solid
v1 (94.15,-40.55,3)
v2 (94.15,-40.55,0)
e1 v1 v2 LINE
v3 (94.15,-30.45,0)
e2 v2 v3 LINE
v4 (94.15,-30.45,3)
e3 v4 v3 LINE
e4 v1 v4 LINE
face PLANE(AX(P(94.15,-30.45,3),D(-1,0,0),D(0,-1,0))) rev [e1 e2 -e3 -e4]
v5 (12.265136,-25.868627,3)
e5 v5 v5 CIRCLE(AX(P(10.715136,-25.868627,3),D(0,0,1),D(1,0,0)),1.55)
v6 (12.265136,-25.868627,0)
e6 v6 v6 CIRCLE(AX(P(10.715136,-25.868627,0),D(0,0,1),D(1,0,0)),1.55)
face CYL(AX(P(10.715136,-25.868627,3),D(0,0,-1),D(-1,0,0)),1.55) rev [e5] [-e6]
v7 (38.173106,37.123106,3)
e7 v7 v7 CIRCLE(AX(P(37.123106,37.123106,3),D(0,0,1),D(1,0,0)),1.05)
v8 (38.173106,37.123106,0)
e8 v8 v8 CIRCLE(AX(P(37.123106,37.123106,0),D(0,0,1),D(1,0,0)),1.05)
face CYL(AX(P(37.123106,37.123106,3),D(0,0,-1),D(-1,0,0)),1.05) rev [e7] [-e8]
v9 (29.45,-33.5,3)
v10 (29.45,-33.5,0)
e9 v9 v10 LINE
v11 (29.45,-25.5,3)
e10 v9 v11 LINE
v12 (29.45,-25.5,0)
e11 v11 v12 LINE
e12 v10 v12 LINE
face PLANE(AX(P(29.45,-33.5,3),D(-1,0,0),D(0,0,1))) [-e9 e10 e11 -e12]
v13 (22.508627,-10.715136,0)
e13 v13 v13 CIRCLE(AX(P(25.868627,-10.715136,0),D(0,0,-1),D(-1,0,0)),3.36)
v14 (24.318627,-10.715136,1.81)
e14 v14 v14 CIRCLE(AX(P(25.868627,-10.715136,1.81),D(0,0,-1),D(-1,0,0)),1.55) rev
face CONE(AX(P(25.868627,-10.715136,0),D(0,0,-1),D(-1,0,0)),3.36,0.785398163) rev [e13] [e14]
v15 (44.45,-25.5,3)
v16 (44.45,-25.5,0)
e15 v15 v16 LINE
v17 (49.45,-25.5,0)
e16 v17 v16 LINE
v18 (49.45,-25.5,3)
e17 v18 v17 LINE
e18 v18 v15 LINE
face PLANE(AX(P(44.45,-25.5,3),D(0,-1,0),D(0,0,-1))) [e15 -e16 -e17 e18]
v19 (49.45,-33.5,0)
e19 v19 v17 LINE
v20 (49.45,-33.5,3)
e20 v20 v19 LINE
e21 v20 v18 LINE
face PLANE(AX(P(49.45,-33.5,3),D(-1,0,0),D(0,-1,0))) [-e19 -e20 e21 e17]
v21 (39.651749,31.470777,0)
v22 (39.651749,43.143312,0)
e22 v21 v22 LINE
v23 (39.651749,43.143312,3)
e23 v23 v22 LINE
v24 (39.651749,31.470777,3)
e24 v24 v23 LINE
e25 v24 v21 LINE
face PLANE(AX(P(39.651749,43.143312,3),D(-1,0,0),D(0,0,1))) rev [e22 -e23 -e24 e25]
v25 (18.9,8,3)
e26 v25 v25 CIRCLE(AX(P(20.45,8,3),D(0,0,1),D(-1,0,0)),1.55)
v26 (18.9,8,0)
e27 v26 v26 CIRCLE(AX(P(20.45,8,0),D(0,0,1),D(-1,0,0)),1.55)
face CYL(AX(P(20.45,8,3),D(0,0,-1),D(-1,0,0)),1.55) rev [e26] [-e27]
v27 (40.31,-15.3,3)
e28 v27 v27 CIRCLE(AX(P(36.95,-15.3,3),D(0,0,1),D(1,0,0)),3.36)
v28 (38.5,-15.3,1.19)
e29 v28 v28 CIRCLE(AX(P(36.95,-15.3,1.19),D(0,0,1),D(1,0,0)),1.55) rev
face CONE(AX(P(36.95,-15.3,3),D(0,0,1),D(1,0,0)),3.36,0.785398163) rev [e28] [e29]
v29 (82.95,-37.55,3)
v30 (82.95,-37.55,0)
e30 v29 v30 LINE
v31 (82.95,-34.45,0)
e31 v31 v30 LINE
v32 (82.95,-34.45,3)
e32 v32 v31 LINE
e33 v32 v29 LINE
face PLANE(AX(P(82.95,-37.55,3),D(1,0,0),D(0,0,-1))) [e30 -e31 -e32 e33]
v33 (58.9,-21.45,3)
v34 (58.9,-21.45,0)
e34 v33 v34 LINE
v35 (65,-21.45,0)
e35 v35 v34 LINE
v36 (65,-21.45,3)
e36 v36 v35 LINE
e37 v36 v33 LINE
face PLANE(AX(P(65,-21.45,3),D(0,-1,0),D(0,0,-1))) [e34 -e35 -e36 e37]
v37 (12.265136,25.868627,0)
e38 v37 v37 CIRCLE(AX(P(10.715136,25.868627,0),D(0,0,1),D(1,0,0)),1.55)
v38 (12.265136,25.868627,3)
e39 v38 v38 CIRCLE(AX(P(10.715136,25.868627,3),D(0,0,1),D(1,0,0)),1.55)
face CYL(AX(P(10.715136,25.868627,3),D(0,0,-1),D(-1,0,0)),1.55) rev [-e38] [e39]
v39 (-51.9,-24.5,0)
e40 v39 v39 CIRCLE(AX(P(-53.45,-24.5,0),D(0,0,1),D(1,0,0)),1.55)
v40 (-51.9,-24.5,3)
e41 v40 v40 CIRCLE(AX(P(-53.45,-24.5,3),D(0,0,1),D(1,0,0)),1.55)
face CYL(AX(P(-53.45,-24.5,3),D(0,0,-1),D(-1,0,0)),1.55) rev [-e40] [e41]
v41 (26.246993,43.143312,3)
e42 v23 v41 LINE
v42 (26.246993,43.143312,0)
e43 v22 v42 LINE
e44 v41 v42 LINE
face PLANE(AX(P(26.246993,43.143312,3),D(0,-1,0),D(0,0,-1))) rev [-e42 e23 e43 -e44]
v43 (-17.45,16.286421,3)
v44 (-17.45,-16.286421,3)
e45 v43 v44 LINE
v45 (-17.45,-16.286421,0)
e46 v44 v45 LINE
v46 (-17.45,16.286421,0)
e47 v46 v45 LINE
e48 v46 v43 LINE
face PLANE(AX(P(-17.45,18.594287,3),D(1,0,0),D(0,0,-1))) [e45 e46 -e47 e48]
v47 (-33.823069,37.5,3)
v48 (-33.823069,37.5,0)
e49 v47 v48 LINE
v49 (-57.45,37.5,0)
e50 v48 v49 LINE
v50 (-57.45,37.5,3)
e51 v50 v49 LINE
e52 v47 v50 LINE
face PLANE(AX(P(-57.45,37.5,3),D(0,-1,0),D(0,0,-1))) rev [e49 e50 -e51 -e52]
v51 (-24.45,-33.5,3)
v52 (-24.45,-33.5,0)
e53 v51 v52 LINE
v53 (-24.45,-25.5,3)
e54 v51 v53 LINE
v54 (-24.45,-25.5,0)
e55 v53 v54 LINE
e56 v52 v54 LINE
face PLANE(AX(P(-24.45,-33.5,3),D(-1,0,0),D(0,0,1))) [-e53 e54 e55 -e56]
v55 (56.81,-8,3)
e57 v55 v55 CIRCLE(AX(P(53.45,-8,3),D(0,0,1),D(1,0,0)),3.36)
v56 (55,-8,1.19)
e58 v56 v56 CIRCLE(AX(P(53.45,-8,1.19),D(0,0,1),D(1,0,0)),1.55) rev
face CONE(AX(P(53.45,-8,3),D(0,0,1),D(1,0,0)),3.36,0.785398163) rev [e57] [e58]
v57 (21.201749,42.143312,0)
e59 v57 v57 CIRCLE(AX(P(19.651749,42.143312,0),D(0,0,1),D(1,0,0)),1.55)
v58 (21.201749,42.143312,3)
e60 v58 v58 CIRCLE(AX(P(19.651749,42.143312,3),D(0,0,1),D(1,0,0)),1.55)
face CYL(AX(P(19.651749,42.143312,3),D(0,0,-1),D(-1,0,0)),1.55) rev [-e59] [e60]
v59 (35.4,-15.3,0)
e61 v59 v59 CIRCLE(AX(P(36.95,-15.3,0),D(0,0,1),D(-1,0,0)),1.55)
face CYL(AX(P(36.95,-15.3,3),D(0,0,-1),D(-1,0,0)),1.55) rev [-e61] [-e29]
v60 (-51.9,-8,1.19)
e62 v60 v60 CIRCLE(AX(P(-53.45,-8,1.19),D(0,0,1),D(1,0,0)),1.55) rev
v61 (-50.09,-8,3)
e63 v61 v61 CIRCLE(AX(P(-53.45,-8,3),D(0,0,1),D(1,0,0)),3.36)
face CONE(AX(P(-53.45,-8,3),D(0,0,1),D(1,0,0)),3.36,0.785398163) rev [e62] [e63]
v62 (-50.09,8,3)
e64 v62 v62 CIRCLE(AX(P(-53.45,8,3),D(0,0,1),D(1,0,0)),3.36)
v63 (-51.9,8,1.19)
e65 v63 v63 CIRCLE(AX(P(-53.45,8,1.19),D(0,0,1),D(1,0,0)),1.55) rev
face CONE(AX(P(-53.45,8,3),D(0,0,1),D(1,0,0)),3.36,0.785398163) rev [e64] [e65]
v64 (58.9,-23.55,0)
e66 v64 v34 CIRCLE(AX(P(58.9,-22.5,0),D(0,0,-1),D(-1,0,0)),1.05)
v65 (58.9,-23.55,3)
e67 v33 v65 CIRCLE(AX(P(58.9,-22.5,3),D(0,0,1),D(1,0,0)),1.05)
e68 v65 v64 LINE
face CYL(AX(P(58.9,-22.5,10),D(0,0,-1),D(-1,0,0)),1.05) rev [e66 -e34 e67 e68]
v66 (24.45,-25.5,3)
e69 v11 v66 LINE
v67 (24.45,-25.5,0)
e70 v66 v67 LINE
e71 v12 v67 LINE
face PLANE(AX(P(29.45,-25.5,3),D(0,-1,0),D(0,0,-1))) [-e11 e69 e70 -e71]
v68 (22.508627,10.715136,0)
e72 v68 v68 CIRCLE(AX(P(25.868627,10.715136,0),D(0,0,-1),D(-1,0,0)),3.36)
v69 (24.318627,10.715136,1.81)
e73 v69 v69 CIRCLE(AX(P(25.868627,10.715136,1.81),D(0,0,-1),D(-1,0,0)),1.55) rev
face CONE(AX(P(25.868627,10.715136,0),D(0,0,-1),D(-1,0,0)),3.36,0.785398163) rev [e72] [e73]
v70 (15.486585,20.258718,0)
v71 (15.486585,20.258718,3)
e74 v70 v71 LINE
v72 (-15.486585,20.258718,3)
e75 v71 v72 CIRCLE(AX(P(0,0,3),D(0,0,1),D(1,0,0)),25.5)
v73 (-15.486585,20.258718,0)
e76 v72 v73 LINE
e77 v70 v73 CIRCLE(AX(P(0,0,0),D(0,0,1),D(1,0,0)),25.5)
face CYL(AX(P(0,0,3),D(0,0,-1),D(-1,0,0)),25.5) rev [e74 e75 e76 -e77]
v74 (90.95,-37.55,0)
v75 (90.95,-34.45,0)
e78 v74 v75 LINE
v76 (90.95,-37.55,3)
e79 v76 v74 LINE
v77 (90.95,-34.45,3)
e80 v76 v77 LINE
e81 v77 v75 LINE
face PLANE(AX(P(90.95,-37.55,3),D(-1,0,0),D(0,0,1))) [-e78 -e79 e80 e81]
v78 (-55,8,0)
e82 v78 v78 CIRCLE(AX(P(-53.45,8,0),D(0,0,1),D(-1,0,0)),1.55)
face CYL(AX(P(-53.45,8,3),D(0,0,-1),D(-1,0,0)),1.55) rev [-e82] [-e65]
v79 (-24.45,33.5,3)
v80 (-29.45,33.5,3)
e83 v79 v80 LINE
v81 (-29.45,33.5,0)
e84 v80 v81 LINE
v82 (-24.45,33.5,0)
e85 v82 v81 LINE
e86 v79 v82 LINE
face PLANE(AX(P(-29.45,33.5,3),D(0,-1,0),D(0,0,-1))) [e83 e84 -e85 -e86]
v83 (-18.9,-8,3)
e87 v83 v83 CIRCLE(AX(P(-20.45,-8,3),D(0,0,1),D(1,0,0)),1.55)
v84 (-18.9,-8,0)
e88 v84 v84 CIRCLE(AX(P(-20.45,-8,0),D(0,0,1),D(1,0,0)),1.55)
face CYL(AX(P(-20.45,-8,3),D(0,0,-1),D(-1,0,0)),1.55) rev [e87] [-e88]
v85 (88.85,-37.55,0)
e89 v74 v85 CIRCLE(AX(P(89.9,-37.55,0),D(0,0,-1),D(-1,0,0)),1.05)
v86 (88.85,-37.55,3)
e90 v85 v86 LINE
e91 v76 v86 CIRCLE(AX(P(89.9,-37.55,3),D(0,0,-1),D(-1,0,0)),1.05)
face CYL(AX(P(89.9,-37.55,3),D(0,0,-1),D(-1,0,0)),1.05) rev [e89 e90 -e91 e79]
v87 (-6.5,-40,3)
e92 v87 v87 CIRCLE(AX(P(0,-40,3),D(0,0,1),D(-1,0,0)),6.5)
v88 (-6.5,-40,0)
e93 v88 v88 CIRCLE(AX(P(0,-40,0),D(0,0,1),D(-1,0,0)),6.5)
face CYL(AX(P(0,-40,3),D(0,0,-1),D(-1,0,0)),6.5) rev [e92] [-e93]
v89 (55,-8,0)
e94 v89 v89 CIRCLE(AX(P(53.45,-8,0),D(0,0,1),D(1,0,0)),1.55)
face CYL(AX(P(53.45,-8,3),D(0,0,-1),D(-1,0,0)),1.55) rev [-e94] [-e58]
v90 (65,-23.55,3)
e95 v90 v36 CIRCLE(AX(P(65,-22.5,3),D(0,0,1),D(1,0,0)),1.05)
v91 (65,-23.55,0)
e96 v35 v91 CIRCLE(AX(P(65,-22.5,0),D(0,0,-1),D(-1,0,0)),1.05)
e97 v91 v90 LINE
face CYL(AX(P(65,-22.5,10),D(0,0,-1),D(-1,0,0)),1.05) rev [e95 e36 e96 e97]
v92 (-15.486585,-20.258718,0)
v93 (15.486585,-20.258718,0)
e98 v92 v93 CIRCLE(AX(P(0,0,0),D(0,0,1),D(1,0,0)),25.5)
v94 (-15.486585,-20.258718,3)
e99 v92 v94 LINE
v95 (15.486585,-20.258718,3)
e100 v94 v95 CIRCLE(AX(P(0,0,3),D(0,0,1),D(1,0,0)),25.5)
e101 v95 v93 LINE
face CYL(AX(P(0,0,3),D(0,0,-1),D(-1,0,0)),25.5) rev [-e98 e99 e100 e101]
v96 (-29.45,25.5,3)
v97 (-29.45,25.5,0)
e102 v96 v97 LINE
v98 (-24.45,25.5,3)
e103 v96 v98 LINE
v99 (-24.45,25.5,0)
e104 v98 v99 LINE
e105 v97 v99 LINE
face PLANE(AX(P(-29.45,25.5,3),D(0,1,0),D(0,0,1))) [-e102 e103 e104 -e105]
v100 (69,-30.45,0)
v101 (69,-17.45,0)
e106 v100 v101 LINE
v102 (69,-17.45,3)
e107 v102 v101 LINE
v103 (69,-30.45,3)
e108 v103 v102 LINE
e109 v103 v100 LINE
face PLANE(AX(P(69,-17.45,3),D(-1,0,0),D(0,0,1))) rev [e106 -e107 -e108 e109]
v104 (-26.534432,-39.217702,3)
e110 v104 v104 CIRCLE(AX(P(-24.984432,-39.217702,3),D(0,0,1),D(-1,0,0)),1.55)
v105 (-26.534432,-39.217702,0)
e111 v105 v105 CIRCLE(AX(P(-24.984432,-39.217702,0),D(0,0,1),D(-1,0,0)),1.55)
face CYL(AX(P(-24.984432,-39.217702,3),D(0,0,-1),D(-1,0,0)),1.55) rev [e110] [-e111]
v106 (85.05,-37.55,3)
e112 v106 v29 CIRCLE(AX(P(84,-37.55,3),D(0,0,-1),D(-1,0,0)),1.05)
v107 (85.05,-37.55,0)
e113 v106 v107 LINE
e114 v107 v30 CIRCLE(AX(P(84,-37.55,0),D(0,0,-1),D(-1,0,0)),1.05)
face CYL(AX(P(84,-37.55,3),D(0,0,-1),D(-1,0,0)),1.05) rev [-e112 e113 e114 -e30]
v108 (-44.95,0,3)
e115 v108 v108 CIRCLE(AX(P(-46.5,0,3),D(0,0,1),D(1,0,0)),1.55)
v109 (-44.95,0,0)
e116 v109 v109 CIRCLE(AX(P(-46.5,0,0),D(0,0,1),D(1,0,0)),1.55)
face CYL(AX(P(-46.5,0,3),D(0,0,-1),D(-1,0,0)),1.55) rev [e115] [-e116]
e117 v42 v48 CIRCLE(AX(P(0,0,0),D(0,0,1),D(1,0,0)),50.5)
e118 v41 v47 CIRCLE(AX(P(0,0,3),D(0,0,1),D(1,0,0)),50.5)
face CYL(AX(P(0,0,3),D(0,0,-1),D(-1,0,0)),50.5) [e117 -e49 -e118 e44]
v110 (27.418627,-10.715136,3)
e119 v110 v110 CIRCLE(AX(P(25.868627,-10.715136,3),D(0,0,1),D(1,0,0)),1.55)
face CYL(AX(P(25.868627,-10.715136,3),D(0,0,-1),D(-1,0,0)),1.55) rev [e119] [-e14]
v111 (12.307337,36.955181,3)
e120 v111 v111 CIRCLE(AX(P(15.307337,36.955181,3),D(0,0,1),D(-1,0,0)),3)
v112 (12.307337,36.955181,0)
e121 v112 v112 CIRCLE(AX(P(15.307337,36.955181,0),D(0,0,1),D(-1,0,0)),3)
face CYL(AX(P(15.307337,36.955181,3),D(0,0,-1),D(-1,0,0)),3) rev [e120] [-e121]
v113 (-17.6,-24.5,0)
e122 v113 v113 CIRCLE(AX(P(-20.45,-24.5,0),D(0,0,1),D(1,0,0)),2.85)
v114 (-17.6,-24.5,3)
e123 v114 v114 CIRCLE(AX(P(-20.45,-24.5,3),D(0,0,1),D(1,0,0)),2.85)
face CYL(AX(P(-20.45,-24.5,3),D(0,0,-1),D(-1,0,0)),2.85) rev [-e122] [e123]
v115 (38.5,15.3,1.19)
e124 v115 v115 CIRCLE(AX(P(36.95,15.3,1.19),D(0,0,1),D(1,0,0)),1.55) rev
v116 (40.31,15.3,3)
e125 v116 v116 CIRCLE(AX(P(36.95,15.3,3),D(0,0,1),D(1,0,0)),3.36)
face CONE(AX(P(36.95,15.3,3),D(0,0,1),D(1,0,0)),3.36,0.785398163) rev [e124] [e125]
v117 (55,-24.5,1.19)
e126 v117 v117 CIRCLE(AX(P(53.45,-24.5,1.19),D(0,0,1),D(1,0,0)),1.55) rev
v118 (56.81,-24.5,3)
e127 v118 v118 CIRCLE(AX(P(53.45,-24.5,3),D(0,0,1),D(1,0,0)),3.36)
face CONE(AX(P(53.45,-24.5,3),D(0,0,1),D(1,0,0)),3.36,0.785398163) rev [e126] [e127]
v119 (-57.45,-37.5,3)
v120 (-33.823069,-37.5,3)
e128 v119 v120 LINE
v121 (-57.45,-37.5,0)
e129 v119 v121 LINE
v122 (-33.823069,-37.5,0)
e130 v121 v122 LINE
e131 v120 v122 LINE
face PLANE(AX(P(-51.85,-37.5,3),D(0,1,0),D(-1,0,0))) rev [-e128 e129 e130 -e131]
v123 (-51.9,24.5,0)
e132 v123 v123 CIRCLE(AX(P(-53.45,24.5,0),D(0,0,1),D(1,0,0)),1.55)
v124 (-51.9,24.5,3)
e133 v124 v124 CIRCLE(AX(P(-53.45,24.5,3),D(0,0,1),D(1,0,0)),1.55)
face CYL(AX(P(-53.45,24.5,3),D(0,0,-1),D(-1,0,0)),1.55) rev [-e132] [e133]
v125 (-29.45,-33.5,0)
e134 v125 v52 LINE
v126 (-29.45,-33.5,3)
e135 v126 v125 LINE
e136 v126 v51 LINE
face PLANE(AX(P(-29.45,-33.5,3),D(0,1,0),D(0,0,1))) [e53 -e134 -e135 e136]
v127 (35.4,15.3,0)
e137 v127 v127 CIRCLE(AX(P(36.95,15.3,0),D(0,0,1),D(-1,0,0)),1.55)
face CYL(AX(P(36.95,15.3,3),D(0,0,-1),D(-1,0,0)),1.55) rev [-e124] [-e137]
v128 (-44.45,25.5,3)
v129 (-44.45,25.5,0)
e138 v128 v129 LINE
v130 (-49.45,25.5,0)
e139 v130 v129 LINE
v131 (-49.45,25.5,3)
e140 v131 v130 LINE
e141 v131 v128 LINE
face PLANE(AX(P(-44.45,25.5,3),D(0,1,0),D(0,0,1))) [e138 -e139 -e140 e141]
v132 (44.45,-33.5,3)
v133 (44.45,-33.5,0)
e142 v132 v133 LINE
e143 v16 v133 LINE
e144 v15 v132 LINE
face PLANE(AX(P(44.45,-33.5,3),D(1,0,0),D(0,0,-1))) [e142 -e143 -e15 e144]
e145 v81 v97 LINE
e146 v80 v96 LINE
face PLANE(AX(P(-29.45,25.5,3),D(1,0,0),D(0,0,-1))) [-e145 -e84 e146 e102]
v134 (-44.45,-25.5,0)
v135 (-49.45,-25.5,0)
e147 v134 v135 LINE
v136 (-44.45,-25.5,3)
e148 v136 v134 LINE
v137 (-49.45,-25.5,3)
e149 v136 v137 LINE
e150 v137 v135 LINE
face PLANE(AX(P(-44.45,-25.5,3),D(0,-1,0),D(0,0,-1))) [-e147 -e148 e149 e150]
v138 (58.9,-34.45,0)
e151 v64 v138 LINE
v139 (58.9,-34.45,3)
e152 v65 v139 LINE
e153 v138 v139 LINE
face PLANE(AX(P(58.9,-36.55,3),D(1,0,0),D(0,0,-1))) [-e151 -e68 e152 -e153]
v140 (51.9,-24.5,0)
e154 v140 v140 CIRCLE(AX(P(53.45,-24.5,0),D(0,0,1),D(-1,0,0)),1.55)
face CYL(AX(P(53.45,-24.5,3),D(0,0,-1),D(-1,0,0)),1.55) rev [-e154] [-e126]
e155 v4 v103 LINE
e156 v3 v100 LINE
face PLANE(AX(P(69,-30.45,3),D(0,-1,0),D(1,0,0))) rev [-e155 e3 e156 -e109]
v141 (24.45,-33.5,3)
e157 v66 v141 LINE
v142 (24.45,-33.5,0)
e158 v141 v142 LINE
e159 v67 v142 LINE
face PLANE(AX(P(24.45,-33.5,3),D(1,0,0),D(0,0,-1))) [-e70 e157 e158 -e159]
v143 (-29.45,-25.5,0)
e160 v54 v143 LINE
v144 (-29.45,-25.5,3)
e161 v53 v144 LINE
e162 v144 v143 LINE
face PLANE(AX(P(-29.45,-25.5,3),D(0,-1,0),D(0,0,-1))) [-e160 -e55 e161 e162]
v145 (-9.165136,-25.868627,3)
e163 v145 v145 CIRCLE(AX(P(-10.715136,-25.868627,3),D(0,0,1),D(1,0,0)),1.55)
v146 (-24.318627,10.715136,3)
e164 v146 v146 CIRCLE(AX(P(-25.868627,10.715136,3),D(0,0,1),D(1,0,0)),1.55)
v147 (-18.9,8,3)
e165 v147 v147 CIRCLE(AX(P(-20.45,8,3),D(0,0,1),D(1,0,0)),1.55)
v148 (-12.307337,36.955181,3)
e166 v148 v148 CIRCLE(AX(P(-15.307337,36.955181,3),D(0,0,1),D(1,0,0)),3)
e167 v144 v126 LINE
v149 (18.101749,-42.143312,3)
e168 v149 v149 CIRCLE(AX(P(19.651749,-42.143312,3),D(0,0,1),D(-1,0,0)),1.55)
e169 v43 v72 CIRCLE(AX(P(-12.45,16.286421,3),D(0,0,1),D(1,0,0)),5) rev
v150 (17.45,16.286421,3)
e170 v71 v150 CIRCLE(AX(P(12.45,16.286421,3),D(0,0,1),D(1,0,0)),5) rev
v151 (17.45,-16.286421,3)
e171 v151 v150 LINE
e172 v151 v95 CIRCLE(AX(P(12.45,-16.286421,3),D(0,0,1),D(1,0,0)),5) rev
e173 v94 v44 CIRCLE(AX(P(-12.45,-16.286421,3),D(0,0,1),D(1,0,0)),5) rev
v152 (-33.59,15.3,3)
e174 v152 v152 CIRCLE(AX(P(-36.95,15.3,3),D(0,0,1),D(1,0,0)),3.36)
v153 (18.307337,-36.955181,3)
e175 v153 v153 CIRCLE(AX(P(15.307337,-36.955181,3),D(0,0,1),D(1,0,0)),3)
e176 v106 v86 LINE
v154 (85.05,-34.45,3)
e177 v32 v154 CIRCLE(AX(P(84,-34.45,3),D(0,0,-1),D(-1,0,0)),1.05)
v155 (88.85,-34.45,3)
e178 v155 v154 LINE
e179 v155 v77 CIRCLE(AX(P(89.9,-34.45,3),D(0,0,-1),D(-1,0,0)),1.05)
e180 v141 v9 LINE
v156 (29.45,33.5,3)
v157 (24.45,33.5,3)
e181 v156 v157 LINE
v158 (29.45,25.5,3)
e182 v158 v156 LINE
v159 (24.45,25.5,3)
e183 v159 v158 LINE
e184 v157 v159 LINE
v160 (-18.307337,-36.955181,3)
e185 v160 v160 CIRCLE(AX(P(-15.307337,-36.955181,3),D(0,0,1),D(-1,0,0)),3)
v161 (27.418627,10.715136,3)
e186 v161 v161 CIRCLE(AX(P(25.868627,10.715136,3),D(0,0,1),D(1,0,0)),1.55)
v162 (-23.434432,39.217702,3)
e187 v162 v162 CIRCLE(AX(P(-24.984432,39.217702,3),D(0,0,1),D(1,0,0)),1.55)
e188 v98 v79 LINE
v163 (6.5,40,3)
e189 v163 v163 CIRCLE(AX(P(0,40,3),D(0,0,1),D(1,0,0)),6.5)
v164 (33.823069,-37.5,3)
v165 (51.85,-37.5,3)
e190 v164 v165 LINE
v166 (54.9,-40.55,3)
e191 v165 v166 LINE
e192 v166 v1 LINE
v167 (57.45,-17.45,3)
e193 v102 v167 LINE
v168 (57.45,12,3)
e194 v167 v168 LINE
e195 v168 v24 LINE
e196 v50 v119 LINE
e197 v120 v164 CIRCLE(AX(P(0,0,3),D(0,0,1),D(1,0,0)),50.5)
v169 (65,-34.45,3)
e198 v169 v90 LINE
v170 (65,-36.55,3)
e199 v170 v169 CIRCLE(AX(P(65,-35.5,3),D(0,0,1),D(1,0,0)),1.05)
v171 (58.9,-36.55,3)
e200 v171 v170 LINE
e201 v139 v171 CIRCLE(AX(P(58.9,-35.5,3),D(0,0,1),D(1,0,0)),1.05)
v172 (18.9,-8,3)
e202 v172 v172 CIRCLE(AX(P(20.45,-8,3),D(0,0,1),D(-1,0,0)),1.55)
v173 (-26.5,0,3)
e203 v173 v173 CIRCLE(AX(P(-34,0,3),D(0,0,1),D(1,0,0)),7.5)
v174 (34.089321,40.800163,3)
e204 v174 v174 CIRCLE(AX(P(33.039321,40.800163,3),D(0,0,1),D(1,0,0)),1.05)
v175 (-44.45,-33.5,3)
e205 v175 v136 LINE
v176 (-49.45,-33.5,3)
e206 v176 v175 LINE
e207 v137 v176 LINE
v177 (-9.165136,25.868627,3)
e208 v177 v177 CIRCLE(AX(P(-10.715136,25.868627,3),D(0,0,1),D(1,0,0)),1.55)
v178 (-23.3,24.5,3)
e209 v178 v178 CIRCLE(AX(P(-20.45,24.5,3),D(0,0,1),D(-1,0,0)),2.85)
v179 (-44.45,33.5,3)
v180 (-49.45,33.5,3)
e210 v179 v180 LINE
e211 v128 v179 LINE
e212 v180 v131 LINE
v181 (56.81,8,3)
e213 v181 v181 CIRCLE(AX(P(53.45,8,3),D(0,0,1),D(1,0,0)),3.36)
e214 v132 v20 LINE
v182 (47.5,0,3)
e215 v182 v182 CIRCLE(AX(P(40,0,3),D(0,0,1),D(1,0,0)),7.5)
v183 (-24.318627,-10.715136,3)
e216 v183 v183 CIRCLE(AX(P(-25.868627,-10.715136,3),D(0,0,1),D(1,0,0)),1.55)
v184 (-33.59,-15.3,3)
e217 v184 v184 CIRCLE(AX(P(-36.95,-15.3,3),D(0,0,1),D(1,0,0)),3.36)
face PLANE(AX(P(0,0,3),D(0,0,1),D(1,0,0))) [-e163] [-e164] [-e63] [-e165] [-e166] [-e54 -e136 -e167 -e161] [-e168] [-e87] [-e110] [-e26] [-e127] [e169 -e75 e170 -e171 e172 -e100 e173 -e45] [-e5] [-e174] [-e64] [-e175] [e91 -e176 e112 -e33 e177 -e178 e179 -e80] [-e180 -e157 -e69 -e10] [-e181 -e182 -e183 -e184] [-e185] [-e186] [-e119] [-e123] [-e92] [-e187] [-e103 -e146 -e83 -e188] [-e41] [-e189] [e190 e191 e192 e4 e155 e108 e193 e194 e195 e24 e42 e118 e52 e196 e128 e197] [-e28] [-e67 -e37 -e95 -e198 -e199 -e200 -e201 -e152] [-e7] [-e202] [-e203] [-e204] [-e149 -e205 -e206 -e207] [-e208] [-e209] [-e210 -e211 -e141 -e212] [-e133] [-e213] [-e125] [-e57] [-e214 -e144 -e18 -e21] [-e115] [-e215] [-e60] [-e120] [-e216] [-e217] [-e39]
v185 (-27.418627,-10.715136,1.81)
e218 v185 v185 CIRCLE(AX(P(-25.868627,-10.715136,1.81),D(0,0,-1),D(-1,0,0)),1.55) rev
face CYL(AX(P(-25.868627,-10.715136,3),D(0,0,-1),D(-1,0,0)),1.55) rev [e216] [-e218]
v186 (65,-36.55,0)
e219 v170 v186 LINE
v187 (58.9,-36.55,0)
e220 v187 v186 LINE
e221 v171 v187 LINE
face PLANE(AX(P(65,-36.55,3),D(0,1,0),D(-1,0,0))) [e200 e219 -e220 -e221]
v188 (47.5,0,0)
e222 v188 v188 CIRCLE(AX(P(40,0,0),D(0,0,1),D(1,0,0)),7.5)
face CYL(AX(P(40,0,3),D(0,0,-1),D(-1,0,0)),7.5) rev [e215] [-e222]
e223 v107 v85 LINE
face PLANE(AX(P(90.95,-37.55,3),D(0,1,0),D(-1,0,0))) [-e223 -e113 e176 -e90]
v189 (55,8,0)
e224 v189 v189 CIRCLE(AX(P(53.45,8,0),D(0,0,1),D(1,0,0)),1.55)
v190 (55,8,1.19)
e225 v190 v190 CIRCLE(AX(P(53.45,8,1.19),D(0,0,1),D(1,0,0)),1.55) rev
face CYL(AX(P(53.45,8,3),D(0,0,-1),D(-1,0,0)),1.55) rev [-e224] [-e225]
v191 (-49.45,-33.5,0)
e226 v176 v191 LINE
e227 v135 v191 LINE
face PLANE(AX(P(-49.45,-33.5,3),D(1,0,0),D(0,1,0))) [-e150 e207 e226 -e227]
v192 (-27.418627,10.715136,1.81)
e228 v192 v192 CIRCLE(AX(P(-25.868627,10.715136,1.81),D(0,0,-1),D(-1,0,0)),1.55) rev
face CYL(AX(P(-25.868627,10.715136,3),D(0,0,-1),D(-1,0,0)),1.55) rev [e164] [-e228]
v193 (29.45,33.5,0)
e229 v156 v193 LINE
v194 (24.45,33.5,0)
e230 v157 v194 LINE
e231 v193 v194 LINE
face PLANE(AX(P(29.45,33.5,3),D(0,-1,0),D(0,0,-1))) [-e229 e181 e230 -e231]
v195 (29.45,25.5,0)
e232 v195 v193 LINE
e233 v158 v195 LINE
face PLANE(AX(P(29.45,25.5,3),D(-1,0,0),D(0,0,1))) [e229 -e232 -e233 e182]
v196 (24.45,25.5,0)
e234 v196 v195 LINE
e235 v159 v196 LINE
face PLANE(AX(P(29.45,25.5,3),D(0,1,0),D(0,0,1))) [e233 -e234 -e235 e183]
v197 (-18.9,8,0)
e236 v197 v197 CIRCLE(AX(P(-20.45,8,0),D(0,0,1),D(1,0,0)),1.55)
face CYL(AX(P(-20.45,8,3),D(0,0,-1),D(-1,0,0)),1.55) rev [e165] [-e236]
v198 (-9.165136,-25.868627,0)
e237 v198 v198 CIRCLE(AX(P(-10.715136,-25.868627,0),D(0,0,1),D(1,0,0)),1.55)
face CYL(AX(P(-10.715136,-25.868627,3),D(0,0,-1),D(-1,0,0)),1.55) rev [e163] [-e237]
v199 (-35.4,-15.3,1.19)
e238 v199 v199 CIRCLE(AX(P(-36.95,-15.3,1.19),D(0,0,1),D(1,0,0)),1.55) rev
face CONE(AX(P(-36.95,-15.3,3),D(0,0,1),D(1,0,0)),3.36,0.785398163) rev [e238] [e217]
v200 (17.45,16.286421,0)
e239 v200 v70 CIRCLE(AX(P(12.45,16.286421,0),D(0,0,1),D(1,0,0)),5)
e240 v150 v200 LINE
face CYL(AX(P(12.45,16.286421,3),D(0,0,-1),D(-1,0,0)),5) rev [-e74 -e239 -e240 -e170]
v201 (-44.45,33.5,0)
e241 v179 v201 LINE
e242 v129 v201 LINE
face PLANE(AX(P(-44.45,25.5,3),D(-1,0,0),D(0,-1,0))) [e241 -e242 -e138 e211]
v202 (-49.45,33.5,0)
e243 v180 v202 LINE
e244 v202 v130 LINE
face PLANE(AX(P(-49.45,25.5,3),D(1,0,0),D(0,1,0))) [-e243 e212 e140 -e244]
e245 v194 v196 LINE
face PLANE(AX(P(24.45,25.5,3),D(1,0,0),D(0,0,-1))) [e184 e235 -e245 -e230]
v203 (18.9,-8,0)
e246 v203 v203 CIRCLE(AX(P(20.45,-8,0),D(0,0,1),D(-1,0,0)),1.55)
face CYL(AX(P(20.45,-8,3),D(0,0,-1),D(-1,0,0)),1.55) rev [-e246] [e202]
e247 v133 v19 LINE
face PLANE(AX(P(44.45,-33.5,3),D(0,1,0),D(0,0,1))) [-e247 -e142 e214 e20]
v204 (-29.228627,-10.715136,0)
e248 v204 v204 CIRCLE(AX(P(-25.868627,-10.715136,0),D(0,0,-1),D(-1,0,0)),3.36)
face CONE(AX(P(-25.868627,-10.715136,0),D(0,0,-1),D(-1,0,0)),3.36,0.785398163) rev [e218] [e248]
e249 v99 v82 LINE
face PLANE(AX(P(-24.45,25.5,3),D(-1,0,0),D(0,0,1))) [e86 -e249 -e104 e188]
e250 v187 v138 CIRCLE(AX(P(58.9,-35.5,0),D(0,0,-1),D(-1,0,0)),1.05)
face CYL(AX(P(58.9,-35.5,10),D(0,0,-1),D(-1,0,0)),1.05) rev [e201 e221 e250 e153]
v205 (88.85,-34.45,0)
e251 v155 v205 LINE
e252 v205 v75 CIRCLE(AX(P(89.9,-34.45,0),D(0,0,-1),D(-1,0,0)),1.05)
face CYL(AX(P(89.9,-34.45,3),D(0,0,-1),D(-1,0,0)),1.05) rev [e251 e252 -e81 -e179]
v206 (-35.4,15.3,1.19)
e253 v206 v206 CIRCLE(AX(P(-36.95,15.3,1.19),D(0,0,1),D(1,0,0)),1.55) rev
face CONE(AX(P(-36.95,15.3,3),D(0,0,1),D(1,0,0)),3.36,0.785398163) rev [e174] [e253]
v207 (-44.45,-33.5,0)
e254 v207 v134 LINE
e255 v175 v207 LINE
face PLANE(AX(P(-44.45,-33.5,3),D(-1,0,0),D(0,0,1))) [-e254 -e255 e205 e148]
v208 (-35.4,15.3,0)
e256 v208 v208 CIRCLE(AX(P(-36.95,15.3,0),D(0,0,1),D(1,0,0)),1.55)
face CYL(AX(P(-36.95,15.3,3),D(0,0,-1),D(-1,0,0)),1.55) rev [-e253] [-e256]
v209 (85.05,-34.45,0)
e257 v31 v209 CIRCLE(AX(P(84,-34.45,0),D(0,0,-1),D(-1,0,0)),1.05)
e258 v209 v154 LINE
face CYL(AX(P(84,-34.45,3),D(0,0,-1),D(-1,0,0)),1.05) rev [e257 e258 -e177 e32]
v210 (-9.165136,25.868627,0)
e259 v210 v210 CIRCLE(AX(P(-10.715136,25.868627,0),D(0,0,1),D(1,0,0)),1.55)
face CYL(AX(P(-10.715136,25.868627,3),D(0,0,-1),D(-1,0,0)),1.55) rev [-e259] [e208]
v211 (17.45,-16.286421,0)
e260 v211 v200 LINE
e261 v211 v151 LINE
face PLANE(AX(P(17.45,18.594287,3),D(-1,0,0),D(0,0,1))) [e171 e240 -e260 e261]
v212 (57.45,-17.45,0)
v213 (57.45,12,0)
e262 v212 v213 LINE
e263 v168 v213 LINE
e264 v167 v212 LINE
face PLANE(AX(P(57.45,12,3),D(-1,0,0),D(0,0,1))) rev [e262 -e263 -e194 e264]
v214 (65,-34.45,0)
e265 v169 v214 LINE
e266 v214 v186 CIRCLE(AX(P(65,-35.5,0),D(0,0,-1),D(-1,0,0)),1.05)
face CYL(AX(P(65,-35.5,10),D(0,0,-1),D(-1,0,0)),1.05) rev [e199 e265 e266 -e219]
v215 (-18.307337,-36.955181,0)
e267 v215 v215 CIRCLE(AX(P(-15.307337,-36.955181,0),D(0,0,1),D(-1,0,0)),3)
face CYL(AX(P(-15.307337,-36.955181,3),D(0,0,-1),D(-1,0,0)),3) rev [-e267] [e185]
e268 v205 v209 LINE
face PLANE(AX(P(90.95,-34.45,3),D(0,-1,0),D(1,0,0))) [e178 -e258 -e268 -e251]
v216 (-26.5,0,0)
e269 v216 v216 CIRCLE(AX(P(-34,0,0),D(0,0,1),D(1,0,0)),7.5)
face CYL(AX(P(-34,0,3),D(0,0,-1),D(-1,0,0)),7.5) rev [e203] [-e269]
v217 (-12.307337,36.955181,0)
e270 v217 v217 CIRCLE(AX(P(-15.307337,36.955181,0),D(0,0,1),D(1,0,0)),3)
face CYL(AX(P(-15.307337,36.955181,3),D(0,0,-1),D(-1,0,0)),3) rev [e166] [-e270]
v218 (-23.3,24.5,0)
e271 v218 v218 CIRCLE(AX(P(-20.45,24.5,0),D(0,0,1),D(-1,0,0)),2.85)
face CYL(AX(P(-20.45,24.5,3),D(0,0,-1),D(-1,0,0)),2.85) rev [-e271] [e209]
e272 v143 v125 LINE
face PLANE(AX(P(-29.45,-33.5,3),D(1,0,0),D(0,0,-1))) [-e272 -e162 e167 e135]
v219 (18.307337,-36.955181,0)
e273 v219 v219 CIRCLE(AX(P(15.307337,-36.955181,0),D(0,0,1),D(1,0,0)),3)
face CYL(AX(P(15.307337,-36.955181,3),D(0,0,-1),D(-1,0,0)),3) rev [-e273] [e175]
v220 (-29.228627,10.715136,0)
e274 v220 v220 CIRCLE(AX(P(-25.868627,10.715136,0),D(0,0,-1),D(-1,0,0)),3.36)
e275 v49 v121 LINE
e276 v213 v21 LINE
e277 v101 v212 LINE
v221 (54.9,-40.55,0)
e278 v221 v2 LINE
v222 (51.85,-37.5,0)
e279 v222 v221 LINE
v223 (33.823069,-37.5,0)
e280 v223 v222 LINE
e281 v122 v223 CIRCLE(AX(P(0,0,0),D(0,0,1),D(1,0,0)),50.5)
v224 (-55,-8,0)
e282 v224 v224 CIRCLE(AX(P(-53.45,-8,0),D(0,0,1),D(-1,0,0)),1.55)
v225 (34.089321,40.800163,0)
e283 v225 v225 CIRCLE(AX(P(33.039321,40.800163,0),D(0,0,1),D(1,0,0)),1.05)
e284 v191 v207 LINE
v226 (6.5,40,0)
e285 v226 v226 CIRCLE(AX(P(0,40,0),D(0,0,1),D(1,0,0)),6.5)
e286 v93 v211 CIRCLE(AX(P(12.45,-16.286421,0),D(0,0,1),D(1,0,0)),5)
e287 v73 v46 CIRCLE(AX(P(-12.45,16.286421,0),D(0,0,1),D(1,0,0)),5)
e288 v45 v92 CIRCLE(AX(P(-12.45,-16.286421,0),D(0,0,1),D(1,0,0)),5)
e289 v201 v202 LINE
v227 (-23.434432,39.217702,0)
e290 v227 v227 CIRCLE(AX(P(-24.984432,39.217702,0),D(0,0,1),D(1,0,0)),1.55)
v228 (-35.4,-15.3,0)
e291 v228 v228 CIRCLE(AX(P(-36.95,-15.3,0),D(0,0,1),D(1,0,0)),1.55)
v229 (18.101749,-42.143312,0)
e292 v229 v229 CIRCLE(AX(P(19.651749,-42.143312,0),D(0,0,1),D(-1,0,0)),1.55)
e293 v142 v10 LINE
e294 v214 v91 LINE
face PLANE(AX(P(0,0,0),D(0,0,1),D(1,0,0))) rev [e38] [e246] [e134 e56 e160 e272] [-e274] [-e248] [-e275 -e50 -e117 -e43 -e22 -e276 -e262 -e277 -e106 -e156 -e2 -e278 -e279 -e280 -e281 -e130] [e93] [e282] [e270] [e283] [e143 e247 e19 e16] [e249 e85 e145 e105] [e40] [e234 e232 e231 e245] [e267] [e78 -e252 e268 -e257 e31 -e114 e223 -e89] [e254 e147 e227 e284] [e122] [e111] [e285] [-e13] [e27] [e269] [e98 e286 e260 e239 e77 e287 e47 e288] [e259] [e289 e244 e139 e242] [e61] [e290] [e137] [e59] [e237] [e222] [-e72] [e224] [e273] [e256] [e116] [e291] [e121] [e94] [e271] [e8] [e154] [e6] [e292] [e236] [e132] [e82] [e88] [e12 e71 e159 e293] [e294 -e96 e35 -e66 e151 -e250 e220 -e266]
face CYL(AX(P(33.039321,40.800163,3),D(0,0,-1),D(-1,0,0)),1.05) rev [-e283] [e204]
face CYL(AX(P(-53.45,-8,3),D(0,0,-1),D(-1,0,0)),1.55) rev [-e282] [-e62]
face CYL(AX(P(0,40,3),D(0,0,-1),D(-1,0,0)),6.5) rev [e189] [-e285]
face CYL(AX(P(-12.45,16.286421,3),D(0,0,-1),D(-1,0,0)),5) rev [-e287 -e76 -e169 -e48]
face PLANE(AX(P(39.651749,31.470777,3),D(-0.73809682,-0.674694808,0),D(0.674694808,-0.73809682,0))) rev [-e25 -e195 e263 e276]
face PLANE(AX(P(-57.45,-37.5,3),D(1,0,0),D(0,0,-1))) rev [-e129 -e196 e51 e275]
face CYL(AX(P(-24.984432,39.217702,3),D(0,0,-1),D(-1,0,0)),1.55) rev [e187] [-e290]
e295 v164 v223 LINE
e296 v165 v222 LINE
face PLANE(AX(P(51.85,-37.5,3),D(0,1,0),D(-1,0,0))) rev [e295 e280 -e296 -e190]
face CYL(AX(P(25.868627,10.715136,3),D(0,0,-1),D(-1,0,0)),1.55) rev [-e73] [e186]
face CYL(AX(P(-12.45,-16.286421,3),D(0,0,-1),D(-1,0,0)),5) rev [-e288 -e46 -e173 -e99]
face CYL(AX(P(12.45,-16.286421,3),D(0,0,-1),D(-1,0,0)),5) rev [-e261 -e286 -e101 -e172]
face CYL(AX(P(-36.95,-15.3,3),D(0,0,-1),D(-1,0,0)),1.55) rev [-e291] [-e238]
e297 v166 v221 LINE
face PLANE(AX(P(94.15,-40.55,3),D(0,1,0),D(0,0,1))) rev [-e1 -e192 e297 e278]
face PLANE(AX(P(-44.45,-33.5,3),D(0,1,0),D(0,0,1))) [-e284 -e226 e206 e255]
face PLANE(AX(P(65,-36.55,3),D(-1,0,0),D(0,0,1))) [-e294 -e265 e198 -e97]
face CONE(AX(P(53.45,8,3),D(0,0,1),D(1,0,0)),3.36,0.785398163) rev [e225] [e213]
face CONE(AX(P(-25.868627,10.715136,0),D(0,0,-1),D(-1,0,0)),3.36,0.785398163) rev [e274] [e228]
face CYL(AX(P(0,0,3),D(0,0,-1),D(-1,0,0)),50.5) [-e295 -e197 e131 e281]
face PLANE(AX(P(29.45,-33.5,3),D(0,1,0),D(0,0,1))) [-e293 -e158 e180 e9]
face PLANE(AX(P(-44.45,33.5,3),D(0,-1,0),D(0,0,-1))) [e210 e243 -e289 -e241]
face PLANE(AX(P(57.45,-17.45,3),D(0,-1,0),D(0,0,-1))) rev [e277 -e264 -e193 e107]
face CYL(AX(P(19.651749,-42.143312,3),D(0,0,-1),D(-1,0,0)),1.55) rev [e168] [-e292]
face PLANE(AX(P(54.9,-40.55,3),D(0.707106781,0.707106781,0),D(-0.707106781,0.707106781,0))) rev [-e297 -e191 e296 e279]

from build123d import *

# Parameters (mm, degrees)
SKETCH_1_R                  = 1.55
SKETCH_1_R_2                = 3
SKETCH_1_R_3                = 1.05
SKETCH_1_R_4                = 7.5
SKETCH_1_R_5                = 6.5
SKETCH_1_R_6                = 2.85
SKETCH_1_W                  = 5
SKETCH_1_H                  = 8
SKETCH_1_W_2                = 6.1
SKETCH_1_H_2                = 15.1
SKETCH_1_W_3                = 8
SKETCH_1_H_3                = 3.1
EXTRUDE_1_DEPTH             = 3
HOLE_WIZARD_M3_1_AT_2_COUNT = 2
HOLE_WIZARD_M3_1_AT_2_PITCH = 16
FILLET_1_R                  = 5
SKETCH_5_R                  = 1.05
CUT_EXTRUDE_1_DEPTH         = 10
SKETCH_7_R                  = 1.05
CUT_EXTRUDE_3_DEPTH         = 107.88064605


# Read off the part's stored shape, not the designer's step: M3 六角凹锥坑螺钉的锥形沉头孔2
with BuildPart() as part:
    # 草图1 → 凸台-拉伸1 (new body)
    with BuildSketch(Plane.XY):
        with BuildLine():
            Line((57.45, 12), (57.45, -12))
            Line((57.45, -12), (57.45, -17.45))
            Line((57.45, -17.45), (69, -17.45))
            Line((69, -17.45), (69, -30.45))
            Line((69, -30.45), (94.15, -30.45))
            Line((94.15, -30.45), (94.15, -40.55))
            Line((94.15, -40.55), (69, -40.55))
            Line((69, -40.55), (54.9, -40.55))
            Line((54.9, -40.55), (51.85, -37.5))
            Line((51.85, -37.5), (33.823069051, -37.5))
            ThreePointArc((33.823069051, -37.5), (0, -50.5), (-33.823069051, -37.5))
            Line((-33.823069051, -37.5), (-51.85, -37.5))
            Line((-51.85, -37.5), (-57.45, -37.5))
            Line((-57.45, -37.5), (-57.45, -17.45))
            Line((-57.45, -17.45), (-57.45, 17.45))
            Line((-57.45, 17.45), (-57.45, 37.5))
            Line((-57.45, 37.5), (-51.85, 37.5))
            Line((-51.85, 37.5), (-33.823069051, 37.5))
            ThreePointArc((-33.823069051, 37.5), (-4.723449629, 50.278613979), (26.246992614, 43.143312097))
            Line((26.246992614, 43.143312097), (39.651749171, 43.143312097))
            Line((39.651749171, 43.143312097), (39.651749171, 31.470777261))
            Line((39.651749171, 31.470777261), (57.45, 12))
        make_face()
        with Locations((-53.45, 24.5)):
            Circle(SKETCH_1_R, mode=Mode.SUBTRACT)
        with Locations((-53.45, -24.5)):
            Circle(SKETCH_1_R, mode=Mode.SUBTRACT)
        with Locations((-20.45, 8)):
            Circle(SKETCH_1_R, mode=Mode.SUBTRACT)
        with Locations((-20.45, -8)):
            Circle(SKETCH_1_R, mode=Mode.SUBTRACT)
        with Locations(Location((20.45, -8, 0), (0, 0, 180))):
            Circle(SKETCH_1_R, mode=Mode.SUBTRACT)
        with Locations(Location((20.45, 8, 0), (0, 0, 180))):
            Circle(SKETCH_1_R, mode=Mode.SUBTRACT)
        with Locations((53.45, 8)):
            Circle(SKETCH_1_R, mode=Mode.SUBTRACT)
        with Locations((53.45, -8)):
            Circle(SKETCH_1_R, mode=Mode.SUBTRACT)
        with Locations((-46.5, 0)):
            Circle(SKETCH_1_R, mode=Mode.SUBTRACT)
        with Locations((-24.984431788, 39.21770223)):
            Circle(SKETCH_1_R, mode=Mode.SUBTRACT)
        with Locations((19.651749171, 42.143312097)):
            Circle(SKETCH_1_R, mode=Mode.SUBTRACT)
        with Locations(Location((19.651749171, -42.143312097, 0), (0, 0, 180))):
            Circle(SKETCH_1_R, mode=Mode.SUBTRACT)
        with Locations(Location((-24.984431788, -39.21770223, 0), (0, 0, 180))):
            Circle(SKETCH_1_R, mode=Mode.SUBTRACT)
        with Locations((-10.715136106, 25.86862691)):
            Circle(SKETCH_1_R, mode=Mode.SUBTRACT)
        with Locations((10.715136106, 25.86862691)):
            Circle(SKETCH_1_R, mode=Mode.SUBTRACT)
        with Locations((25.86862691, 10.715136106)):
            Circle(SKETCH_1_R, mode=Mode.SUBTRACT)
        with Locations((25.86862691, -10.715136106)):
            Circle(SKETCH_1_R, mode=Mode.SUBTRACT)
        with Locations((10.715136106, -25.86862691)):
            Circle(SKETCH_1_R, mode=Mode.SUBTRACT)
        with Locations((-10.715136106, -25.86862691)):
            Circle(SKETCH_1_R, mode=Mode.SUBTRACT)
        with Locations((-25.86862691, -10.715136106)):
            Circle(SKETCH_1_R, mode=Mode.SUBTRACT)
        with Locations((-25.86862691, 10.715136106)):
            Circle(SKETCH_1_R, mode=Mode.SUBTRACT)
        with Locations((-36.95, 15.3)):
            Circle(SKETCH_1_R, mode=Mode.SUBTRACT)
        with Locations((-36.95, -15.3)):
            Circle(SKETCH_1_R, mode=Mode.SUBTRACT)
        with Locations(Location((36.95, -15.3, 0), (0, 0, 180))):
            Circle(SKETCH_1_R, mode=Mode.SUBTRACT)
        with Locations(Location((36.95, 15.3, 0), (0, 0, 180))):
            Circle(SKETCH_1_R, mode=Mode.SUBTRACT)
        with Locations((-15.307337295, 36.9551813)):
            Circle(SKETCH_1_R_2, mode=Mode.SUBTRACT)
        with Locations(Location((15.307337295, 36.9551813, 0), (0, 0, 180))):
            Circle(SKETCH_1_R_2, mode=Mode.SUBTRACT)
        with Locations(Location((-15.307337295, -36.9551813, 0), (0, 0, 180))):
            Circle(SKETCH_1_R_2, mode=Mode.SUBTRACT)
        with Locations((15.307337295, -36.9551813)):
            Circle(SKETCH_1_R_2, mode=Mode.SUBTRACT)
        with Locations((33.03932053, 40.800162976)):
            Circle(SKETCH_1_R_3, mode=Mode.SUBTRACT)
        with Locations((37.123106012, 37.123106012)):
            Circle(SKETCH_1_R_3, mode=Mode.SUBTRACT)
        with Locations((40, 0)):
            Circle(SKETCH_1_R_4, mode=Mode.SUBTRACT)
        with Locations((0, 40)):
            Circle(SKETCH_1_R_5, mode=Mode.SUBTRACT)
        with Locations(Location((0, -40, 0), (0, 0, 180))):
            Circle(SKETCH_1_R_5, mode=Mode.SUBTRACT)
        with Locations(Location((-53.45, -8, 0), (0, 0, 180))):
            Circle(SKETCH_1_R, mode=Mode.SUBTRACT)
        with Locations(Location((-53.45, 8, 0), (0, 0, 180))):
            Circle(SKETCH_1_R, mode=Mode.SUBTRACT)
        with Locations((-20.45, -24.5)):
            Circle(SKETCH_1_R_6, mode=Mode.SUBTRACT)
        with Locations(Location((-20.45, 24.5, 0), (0, 0, 180))):
            Circle(SKETCH_1_R_6, mode=Mode.SUBTRACT)
        with Locations(Location((53.45, -24.5, 0), (0, 0, 180))):
            Circle(SKETCH_1_R, mode=Mode.SUBTRACT)
        with Locations((-34, 0)):
            Circle(SKETCH_1_R_4, mode=Mode.SUBTRACT)
        with BuildLine():
            Line((-17.45, 18.594286757), (-17.45, -18.594286757))
            ThreePointArc((-17.45, -18.594286757), (0, -25.5), (17.45, -18.594286757))
            Line((17.45, -18.594286757), (17.45, 18.594286757))
            ThreePointArc((17.45, 18.594286757), (0, 25.5), (-17.45, 18.594286757))
        make_face(mode=Mode.SUBTRACT)
        with Locations((-26.95, -29.5)):
            Rectangle(SKETCH_1_W, SKETCH_1_H, mode=Mode.SUBTRACT)
        with Locations((-46.95, 29.5)):
            Rectangle(SKETCH_1_W, SKETCH_1_H, mode=Mode.SUBTRACT)
        with Locations((-46.95, -29.5)):
            Rectangle(SKETCH_1_W, SKETCH_1_H, mode=Mode.SUBTRACT)
        with Locations((-26.95, 29.5)):
            Rectangle(SKETCH_1_W, SKETCH_1_H, mode=Mode.SUBTRACT)
        with Locations((46.95, -29.5)):
            Rectangle(SKETCH_1_W, SKETCH_1_H, mode=Mode.SUBTRACT)
        with Locations((26.95, -29.5)):
            Rectangle(SKETCH_1_W, SKETCH_1_H, mode=Mode.SUBTRACT)
        with Locations((26.95, 29.5)):
            Rectangle(SKETCH_1_W, SKETCH_1_H, mode=Mode.SUBTRACT)
        with Locations((61.95, -29)):
            Rectangle(SKETCH_1_W_2, SKETCH_1_H_2, mode=Mode.SUBTRACT)
        with Locations((86.95, -36)):
            Rectangle(SKETCH_1_W_3, SKETCH_1_H_3, mode=Mode.SUBTRACT)
    extrude(amount=EXTRUDE_1_DEPTH)

    # 草图3 → M3 六角凹锥坑螺钉的锥形沉头孔1 (revolve, cut)
    with BuildSketch(Plane(origin=(-53.45, -8, 3), x_dir=(0, -1, 0), z_dir=(1, 0, 0))):
        Polygon((0, 0), (0, 3), (1.5, 3), (1.5, 1.86), (3.36, 0), align=None)
    hole_wizard_m3_1 = revolve(axis=Axis((-53.45, -8, 9.35), (0, 0, -1)), mode=Mode.SUBTRACT)

    # M3 六角凹锥坑螺钉的锥形沉头孔1 at 2: M3 六角凹锥坑螺钉的锥形沉头孔1 ×2
    with Locations(*[(0, i * HOLE_WIZARD_M3_1_AT_2_PITCH, 0) for i in range(1, HOLE_WIZARD_M3_1_AT_2_COUNT)]):
        add(hole_wizard_m3_1, mode=Mode.SUBTRACT)

    # 圆角1
    fillet_1_edges = [part.edges().sort_by_distance(p)[0] for p in [
        (17.45, 18.594286757, 1.5),
        (-17.45, 18.594286757, 1.5),
        (-17.45, -18.594286757, 1.5),
        (17.45, -18.594286757, 1.5),
    ]]
    fillet(fillet_1_edges, radius=FILLET_1_R)

    # M3 六角凹锥坑螺钉的锥形沉头孔2 outline → M3 六角凹锥坑螺钉的锥形沉头孔2 (revolve, cut)
    with BuildSketch(Plane(origin=(53.45, 8, 0), x_dir=(1, 0, 0), z_dir=(0, -1, 0))):
        Polygon((1.55, 3), (1.55, 1.19), (3.36, 3), align=None)
    revolve(axis=Axis((53.45, 8, 0), (0, 0, 1)), mode=Mode.SUBTRACT)

    # Hole Wizard M3 _2 2 outline → Hole Wizard M3 _2 2 (revolve, cut)
    with BuildSketch(Plane(origin=(53.45, -8, 0), x_dir=(1, 0, 0), z_dir=(0, -1, 0))):
        Polygon((1.55, 3), (1.55, 1.19), (3.36, 3), align=None)
    revolve(axis=Axis((53.45, -8, 0), (0, 0, 1)), mode=Mode.SUBTRACT)

    # Hole Wizard M3 _2 3 outline → Hole Wizard M3 _2 3 (revolve, cut)
    with BuildSketch(Plane(origin=(53.45, -24.5, 0), x_dir=(1, 0, 0), z_dir=(0, -1, 0))):
        Polygon((1.55, 3), (1.55, 1.19), (3.36, 3), align=None)
    revolve(axis=Axis((53.45, -24.5, 0), (0, 0, 1)), mode=Mode.SUBTRACT)

    # Hole Wizard M3 _2 4 outline → Hole Wizard M3 _2 4 (revolve, cut)
    with BuildSketch(Plane(origin=(-36.95, 15.3, 0), x_dir=(1, 0, 0), z_dir=(0, -1, 0))):
        Polygon((1.55, 3), (1.55, 1.19), (3.36, 3), align=None)
    revolve(axis=Axis((-36.95, 15.3, 0), (0, 0, 1)), mode=Mode.SUBTRACT)

    # Hole Wizard M3 _2 5 outline → Hole Wizard M3 _2 5 (revolve, cut)
    with BuildSketch(Plane(origin=(-36.95, -15.3, 0), x_dir=(1, 0, 0), z_dir=(0, -1, 0))):
        Polygon((1.55, 3), (1.55, 1.19), (3.36, 3), align=None)
    revolve(axis=Axis((-36.95, -15.3, 0), (0, 0, 1)), mode=Mode.SUBTRACT)

    # Hole Wizard M3 _2 6 outline → Hole Wizard M3 _2 6 (revolve, cut)
    with BuildSketch(Plane(origin=(36.95, 15.3, 0), x_dir=(1, 0, 0), z_dir=(0, -1, 0))):
        Polygon((1.55, 3), (1.55, 1.19), (3.36, 3), align=None)
    revolve(axis=Axis((36.95, 15.3, 0), (0, 0, 1)), mode=Mode.SUBTRACT)

    # Hole Wizard M3 _2 7 outline → Hole Wizard M3 _2 7 (revolve, cut)
    with BuildSketch(Plane(origin=(36.95, -15.3, 0), x_dir=(1, 0, 0), z_dir=(0, -1, 0))):
        Polygon((1.55, 3), (1.55, 1.19), (3.36, 3), align=None)
    revolve(axis=Axis((36.95, -15.3, 0), (0, 0, 1)), mode=Mode.SUBTRACT)

    # Hole Wizard M3 _2 8 outline → Hole Wizard M3 _2 8 (revolve, cut)
    with BuildSketch(Plane(origin=(25.86862691, 10.715136106, 0), x_dir=(1, 0, 0), z_dir=(0, -1, 0))):
        Polygon((3.36, 0), (1.55, 1.81), (1.55, 0), align=None)
    revolve(axis=Axis((25.86862691, 10.715136106, 0), (0, 0, 1)), mode=Mode.SUBTRACT)

    # Hole Wizard M3 _2 9 outline → Hole Wizard M3 _2 9 (revolve, cut)
    with BuildSketch(Plane(origin=(25.86862691, -10.715136106, 0), x_dir=(1, 0, 0), z_dir=(0, -1, 0))):
        Polygon((3.36, 0), (1.55, 1.81), (1.55, 0), align=None)
    revolve(axis=Axis((25.86862691, -10.715136106, 0), (0, 0, 1)), mode=Mode.SUBTRACT)

    # Hole Wizard M3 _2 10 outline → Hole Wizard M3 _2 10 (revolve, cut)
    with BuildSketch(Plane(origin=(-25.86862691, 10.715136106, 0), x_dir=(1, 0, 0), z_dir=(0, -1, 0))):
        Polygon((3.36, 0), (1.55, 1.81), (1.55, 0), align=None)
    revolve(axis=Axis((-25.86862691, 10.715136106, 0), (0, 0, 1)), mode=Mode.SUBTRACT)

    # Hole Wizard M3 _2 11 outline → Hole Wizard M3 _2 11 (revolve, cut)
    with BuildSketch(Plane(origin=(-25.86862691, -10.715136106, 0), x_dir=(1, 0, 0), z_dir=(0, -1, 0))):
        Polygon((3.36, 0), (1.55, 1.81), (1.55, 0), align=None)
    revolve(axis=Axis((-25.86862691, -10.715136106, 0), (0, 0, 1)), mode=Mode.SUBTRACT)

    # 草图5 → 切除-拉伸1 (cut)
    with BuildSketch(Plane(origin=(0, 0, 0), x_dir=(-1, 0, 0), z_dir=(0, 0, -1))):
        with Locations((-65, -35.5)):
            Circle(SKETCH_5_R)
        with Locations((-58.9, -35.5)):
            Circle(SKETCH_5_R)
        with Locations((-65, -22.5)):
            Circle(SKETCH_5_R)
        with Locations((-58.9, -22.5)):
            Circle(SKETCH_5_R)
    extrude(amount=-CUT_EXTRUDE_1_DEPTH, mode=Mode.SUBTRACT)

    # 草图7 → 切除-拉伸3 (cut, through all)
    with BuildSketch(Plane(origin=(0, 0, 0), x_dir=(-1, 0, 0), z_dir=(0, 0, -1))):
        with Locations((-89.9, -37.55)):
            Circle(SKETCH_7_R)
        with Locations((-89.9, -34.45)):
            Circle(SKETCH_7_R)
        with Locations((-84, -34.45)):
            Circle(SKETCH_7_R)
        with Locations((-84, -37.55)):
            Circle(SKETCH_7_R)
        with Locations((84, -37.55)):
            Circle(SKETCH_7_R)
        with Locations((84, -34.45)):
            Circle(SKETCH_7_R)
        with Locations((89.9, -34.45)):
            Circle(SKETCH_7_R)
        with Locations((89.9, -37.55)):
            Circle(SKETCH_7_R)
    extrude(amount=-CUT_EXTRUDE_3_DEPTH, mode=Mode.SUBTRACT)


solid = part.part
